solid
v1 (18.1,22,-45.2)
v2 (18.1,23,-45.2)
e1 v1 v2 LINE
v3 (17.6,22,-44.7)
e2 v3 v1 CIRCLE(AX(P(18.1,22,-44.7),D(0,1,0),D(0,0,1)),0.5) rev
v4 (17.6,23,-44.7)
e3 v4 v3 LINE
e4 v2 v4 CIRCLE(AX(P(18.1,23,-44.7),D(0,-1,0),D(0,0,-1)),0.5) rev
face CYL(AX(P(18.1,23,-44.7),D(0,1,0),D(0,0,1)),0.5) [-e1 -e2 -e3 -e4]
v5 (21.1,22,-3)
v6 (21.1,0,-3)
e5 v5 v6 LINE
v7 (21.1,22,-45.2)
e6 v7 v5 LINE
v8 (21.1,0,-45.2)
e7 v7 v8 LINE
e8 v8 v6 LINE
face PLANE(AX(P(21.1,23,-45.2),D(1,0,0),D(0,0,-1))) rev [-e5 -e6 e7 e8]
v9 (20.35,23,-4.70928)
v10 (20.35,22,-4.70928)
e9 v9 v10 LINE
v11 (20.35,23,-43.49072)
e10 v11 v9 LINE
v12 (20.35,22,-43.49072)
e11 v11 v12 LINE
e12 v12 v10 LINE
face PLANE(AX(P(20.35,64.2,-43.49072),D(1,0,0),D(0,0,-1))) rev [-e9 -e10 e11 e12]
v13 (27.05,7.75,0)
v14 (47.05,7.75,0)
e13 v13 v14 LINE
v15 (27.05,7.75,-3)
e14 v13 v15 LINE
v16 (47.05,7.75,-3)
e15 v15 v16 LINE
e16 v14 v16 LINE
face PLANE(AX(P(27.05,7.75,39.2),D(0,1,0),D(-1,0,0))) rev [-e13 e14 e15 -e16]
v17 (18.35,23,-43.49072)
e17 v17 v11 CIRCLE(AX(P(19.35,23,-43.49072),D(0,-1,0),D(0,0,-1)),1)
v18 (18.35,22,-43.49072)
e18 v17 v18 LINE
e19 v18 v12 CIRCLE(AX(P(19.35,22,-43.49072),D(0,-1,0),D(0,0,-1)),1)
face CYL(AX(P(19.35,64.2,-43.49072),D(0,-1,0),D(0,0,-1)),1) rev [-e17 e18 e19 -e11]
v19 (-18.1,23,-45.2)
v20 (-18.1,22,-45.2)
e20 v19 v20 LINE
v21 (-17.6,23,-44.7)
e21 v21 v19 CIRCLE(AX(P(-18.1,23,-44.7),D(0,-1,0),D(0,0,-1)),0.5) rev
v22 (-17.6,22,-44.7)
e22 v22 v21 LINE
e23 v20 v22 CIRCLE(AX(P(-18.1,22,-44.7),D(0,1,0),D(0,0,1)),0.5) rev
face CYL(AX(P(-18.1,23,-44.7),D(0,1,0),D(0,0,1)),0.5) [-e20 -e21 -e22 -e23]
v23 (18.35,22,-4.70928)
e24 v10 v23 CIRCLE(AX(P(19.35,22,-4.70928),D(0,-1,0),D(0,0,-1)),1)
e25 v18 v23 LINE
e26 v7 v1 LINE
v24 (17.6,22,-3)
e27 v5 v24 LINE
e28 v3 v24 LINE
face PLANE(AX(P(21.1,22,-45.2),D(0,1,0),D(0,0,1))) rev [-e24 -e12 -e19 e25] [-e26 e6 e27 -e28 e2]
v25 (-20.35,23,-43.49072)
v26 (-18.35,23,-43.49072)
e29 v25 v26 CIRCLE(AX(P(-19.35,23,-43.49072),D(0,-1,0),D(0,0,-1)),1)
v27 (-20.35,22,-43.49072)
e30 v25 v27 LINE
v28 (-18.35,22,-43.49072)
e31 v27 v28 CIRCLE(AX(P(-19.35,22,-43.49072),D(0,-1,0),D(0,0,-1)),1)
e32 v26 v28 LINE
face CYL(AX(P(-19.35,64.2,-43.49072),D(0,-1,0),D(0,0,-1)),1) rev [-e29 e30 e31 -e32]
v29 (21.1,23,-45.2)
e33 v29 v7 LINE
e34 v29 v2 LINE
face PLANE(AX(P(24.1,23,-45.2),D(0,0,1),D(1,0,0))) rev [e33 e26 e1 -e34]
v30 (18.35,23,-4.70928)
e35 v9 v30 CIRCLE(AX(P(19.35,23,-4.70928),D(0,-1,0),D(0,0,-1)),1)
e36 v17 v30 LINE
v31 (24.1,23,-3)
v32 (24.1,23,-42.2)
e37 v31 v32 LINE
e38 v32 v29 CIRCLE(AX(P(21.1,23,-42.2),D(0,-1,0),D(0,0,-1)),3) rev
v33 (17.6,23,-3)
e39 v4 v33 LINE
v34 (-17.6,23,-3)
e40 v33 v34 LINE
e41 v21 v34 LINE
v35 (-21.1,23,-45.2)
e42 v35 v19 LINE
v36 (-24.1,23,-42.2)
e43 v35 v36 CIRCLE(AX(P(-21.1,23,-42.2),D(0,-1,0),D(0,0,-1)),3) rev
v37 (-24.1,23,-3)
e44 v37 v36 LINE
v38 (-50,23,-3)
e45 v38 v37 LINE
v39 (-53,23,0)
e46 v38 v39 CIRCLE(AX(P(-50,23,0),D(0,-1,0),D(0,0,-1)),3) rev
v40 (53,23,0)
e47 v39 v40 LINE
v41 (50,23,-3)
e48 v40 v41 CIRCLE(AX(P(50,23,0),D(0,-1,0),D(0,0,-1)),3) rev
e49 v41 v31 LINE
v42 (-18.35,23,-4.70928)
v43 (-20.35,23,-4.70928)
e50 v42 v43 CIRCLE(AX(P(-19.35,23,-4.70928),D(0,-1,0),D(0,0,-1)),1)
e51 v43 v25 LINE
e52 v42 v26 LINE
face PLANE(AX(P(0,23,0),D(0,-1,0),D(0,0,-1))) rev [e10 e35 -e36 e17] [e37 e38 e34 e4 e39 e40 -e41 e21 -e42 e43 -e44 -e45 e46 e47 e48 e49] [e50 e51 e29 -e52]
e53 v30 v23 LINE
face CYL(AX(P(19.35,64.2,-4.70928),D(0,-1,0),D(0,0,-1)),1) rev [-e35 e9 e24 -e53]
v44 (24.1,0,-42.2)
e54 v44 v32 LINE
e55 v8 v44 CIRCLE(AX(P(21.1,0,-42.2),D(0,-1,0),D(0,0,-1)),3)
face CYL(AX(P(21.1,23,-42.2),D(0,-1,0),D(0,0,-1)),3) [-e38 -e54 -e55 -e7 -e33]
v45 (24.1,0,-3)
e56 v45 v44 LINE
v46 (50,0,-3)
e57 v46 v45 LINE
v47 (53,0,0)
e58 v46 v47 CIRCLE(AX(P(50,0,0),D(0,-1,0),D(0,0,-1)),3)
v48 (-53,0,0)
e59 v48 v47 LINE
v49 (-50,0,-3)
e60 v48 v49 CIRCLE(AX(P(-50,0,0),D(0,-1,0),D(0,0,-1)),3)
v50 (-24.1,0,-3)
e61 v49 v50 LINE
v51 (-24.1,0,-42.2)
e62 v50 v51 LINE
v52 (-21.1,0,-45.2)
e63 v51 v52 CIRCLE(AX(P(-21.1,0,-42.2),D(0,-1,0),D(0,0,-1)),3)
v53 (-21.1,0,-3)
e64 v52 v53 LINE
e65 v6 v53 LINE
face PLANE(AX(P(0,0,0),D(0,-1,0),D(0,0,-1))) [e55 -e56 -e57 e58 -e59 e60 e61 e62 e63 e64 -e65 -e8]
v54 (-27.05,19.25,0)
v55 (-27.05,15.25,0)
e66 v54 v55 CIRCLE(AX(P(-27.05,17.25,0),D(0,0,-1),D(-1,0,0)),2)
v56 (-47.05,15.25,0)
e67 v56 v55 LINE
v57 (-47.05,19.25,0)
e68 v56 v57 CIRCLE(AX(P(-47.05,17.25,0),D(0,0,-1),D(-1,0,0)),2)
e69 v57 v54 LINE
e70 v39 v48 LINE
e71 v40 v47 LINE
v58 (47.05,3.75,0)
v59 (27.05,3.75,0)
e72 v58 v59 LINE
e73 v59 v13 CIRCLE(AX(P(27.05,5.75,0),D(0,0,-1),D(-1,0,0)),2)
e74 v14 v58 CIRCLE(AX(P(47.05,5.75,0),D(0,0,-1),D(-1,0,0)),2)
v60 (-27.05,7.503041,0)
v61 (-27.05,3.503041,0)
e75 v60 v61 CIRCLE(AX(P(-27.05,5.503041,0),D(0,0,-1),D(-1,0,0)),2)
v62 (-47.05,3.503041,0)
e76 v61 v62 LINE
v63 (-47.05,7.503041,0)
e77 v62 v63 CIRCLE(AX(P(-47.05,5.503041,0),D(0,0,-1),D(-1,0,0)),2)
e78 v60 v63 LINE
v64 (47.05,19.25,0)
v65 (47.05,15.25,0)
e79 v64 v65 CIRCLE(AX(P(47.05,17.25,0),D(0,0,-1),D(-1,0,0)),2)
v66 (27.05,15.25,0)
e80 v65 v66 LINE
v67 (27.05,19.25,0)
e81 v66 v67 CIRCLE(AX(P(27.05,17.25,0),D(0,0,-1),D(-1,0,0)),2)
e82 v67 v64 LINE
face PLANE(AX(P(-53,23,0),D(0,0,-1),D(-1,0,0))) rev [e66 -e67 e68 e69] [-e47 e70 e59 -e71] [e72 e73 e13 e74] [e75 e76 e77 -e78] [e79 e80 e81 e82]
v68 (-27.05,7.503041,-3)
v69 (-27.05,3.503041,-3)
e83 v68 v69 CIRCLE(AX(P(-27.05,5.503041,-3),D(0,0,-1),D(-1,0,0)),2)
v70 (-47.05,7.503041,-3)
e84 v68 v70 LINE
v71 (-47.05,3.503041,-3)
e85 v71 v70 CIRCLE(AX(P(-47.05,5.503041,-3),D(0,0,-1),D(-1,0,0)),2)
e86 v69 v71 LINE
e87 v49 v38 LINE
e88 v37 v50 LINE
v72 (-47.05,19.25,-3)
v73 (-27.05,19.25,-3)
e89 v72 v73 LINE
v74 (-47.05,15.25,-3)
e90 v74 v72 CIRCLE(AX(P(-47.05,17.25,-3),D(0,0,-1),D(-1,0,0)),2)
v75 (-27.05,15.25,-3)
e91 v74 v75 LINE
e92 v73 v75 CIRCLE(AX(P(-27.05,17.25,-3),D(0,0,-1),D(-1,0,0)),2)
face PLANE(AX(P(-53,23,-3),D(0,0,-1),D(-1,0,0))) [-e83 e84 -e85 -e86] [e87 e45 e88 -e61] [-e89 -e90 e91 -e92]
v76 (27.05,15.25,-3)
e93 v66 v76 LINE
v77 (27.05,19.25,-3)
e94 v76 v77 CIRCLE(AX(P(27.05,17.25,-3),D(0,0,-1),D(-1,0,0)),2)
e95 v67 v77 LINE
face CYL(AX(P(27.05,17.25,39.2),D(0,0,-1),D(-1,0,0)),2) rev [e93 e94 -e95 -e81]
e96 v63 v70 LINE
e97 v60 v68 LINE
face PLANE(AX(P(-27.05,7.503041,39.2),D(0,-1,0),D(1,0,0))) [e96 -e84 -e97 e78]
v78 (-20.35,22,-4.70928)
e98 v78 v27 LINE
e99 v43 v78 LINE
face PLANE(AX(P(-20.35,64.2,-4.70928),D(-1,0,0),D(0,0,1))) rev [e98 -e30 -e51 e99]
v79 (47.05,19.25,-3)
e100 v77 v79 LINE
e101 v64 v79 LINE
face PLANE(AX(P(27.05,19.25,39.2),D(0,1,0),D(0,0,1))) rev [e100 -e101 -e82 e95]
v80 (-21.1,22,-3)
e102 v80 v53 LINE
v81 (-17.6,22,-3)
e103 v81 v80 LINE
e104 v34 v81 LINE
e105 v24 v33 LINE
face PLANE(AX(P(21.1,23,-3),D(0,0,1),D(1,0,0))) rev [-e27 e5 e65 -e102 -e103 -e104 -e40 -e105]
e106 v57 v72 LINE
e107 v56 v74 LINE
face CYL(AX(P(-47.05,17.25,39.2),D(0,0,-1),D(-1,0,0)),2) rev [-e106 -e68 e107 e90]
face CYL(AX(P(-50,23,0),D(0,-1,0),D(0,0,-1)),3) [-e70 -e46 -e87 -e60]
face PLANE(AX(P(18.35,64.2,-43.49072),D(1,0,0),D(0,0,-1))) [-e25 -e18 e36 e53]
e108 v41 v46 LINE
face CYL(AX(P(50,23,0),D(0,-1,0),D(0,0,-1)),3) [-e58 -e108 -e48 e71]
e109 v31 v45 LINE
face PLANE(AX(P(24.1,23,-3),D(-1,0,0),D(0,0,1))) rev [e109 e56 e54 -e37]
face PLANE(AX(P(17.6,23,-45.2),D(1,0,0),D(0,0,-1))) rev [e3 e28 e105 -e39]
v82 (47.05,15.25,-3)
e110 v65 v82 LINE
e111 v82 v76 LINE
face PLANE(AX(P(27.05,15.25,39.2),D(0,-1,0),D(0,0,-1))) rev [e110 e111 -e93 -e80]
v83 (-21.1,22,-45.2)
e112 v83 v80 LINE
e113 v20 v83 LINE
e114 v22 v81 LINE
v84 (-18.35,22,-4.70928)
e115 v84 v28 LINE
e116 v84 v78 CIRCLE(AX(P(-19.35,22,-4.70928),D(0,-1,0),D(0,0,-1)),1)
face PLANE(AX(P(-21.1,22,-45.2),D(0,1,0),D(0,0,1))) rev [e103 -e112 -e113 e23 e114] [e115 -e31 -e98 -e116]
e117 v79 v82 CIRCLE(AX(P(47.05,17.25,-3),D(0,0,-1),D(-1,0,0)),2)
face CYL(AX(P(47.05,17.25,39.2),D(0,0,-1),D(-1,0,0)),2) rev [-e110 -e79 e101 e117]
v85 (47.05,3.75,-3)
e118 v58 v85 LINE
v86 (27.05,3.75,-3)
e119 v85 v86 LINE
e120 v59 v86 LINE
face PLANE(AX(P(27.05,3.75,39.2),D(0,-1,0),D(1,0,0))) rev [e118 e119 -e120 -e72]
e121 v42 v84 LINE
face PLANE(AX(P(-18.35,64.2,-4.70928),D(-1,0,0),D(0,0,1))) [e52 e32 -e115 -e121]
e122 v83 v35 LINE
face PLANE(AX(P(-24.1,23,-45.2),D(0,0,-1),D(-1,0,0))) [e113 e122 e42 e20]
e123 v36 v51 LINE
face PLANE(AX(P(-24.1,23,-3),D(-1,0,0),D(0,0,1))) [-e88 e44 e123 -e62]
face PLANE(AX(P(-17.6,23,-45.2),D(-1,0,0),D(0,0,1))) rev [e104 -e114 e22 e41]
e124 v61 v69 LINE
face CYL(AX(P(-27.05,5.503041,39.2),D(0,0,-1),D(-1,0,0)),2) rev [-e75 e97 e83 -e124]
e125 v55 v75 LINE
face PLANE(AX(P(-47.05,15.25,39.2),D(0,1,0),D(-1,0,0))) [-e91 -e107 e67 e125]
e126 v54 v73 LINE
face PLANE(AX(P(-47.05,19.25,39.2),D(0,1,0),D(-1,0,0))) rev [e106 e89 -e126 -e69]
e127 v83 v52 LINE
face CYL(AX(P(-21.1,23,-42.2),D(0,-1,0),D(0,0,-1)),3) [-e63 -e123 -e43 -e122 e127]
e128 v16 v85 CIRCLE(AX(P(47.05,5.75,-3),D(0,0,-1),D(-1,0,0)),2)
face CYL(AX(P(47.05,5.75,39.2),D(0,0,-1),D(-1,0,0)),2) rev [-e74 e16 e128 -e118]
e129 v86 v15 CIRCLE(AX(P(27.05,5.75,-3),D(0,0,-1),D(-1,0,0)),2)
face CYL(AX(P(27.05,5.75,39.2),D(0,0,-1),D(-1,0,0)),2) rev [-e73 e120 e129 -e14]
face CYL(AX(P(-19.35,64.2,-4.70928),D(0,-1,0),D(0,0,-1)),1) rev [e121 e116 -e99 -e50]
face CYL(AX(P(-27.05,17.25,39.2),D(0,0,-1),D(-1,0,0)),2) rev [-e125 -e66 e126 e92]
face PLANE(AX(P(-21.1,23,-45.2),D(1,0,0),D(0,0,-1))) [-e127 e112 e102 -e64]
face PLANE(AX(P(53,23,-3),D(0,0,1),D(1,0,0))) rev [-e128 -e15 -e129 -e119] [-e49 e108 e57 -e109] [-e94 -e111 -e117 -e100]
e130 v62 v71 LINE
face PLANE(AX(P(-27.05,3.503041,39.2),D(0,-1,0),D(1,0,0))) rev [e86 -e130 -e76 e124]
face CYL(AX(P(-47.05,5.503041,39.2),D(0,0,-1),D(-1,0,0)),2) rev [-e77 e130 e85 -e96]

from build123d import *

# Parameters (mm, degrees)
BOSS_EXTRUDE5_DEPTH = 23
SKETCH3_W           = 3.5
SKETCH3_H           = 1
BOSS_EXTRUDE7_DEPTH = 42.2
CUT_EXTRUDE3_DEPTH  = 42.2
CUT_EXTRUDE4_DEPTH  = 42.2
FILLET1_R           = 3
FILLET2_R           = 3
FILLET3_R           = 0.5
FILLET4_R           = 0.5
FILLET5_R           = 3
FILLET6_R           = 3
CUT_EXTRUDE5_DEPTH  = 42.2
CUT_EXTRUDE6_DEPTH  = 42.2
CUT_EXTRUDE7_DEPTH  = 42.2


with BuildPart() as part:
    # Sketch1 → Boss-Extrude5 (new body)
    with BuildSketch(Plane(origin=(0, 0, 0), x_dir=(1, 0, 0), z_dir=(0, 1, 0))):
        Polygon((-53, 0), (53, 0), (53, 3), (24.1, 3), (24.1, 45.2), (21.1, 45.2), (21.1, 3), (-21.1, 3), (-21.1, 45.2), (-24.1, 45.2), (-24.1, 3), (-53, 3), align=None)
    extrude(amount=BOSS_EXTRUDE5_DEPTH)

    # Sketch3 → Boss-Extrude7 (add)
    with BuildSketch(Plane(origin=(0, 0, -3), x_dir=(-1, 0, 0), z_dir=(0, 0, -1))):
        with Locations((-19.35, 22.5)):
            Rectangle(SKETCH3_W, SKETCH3_H)
        with Locations((19.35, 22.5)):
            Rectangle(SKETCH3_W, SKETCH3_H)
    extrude(amount=BOSS_EXTRUDE7_DEPTH)

    # Sketch5 → Cut-Extrude3 (cut)
    with BuildSketch(Plane(origin=(0, 22, 0), x_dir=(-1, 0, 0), z_dir=(0, -1, 0))):
        with BuildLine():
            Line((-18.35, 43.490720045), (-18.35, 4.709279955))
            ThreePointArc((-18.35, 4.709279955), (-19.35, 3.709279955), (-20.35, 4.709279955))
            Line((-20.35, 4.709279955), (-20.35, 43.490720045))
            ThreePointArc((-20.35, 43.490720045), (-19.35, 44.490720045), (-18.35, 43.490720045))
        make_face()
    extrude(amount=-CUT_EXTRUDE3_DEPTH, mode=Mode.SUBTRACT)

    # Sketch5<4> → Cut-Extrude4 (cut)
    with BuildSketch(Plane(origin=(0, 22, 0), x_dir=(-1, 0, 0), z_dir=(0, -1, 0))):
        with BuildLine():
            Line((18.35, 4.709279955), (18.35, 43.490720045))
            ThreePointArc((18.35, 43.490720045), (19.35, 44.490720045), (20.35, 43.490720045))
            Line((20.35, 43.490720045), (20.35, 4.709279955))
            ThreePointArc((20.35, 4.709279955), (19.35, 3.709279955), (18.35, 4.709279955))
        make_face()
    extrude(amount=-CUT_EXTRUDE4_DEPTH, mode=Mode.SUBTRACT)

    # Fillet1
    fillet1_edges = [part.edges().sort_by_distance(p)[0] for p in [
        (-24.1, 11.5, -45.2),
    ]]
    fillet(fillet1_edges, radius=FILLET1_R)

    # Fillet2
    fillet2_edges = [part.edges().sort_by_distance(p)[0] for p in [
        (24.1, 11.5, -45.2),
    ]]
    fillet(fillet2_edges, radius=FILLET2_R)

    # Fillet3
    fillet3_edges = [part.edges().sort_by_distance(p)[0] for p in [
        (-17.6, 22.5, -45.2),
    ]]
    fillet(fillet3_edges, radius=FILLET3_R)

    # Fillet4
    fillet4_edges = [part.edges().sort_by_distance(p)[0] for p in [
        (17.6, 22.5, -45.2),
    ]]
    fillet(fillet4_edges, radius=FILLET4_R)

    # Fillet5
    fillet5_edges = [part.edges().sort_by_distance(p)[0] for p in [
        (53, 11.5, -3),
    ]]
    fillet(fillet5_edges, radius=FILLET5_R - 0.0001)  # a hair under: the kernel refuses the full size

    # Fillet6
    fillet6_edges = [part.edges().sort_by_distance(p)[0] for p in [
        (-53, 11.5, -3),
    ]]
    fillet(fillet6_edges, radius=FILLET6_R - 0.0001)  # a hair under: the kernel refuses the full size

    # Sketch6 → Cut-Extrude5 (cut)
    with BuildSketch(Plane(origin=(0, 0, -3), x_dir=(-1, 0, 0), z_dir=(0, 0, -1))):
        with BuildLine():
            Line((-27.05, 15.25), (-47.05, 15.25))
            ThreePointArc((-47.05, 15.25), (-49.05, 17.25), (-47.05, 19.25))
            Line((-47.05, 19.25), (-27.05, 19.25))
            ThreePointArc((-27.05, 19.25), (-25.05, 17.25), (-27.05, 15.25))
        make_face()
        with BuildLine():
            Line((-27.05, 3.75), (-47.05, 3.75))
            ThreePointArc((-47.05, 3.75), (-49.05, 5.75), (-47.05, 7.75))
            Line((-47.05, 7.75), (-27.05, 7.75))
            ThreePointArc((-27.05, 7.75), (-25.05, 5.75), (-27.05, 3.75))
        make_face()
    extrude(amount=-CUT_EXTRUDE5_DEPTH, mode=Mode.SUBTRACT)

    # Sketch7 → Cut-Extrude6 (cut)
    with BuildSketch(Plane(origin=(0, 0, -3), x_dir=(-1, 0, 0), z_dir=(0, 0, -1))):
        with BuildLine():
            Line((47.05, 15.25), (27.05, 15.25))
            ThreePointArc((27.05, 15.25), (25.05, 17.25), (27.05, 19.25))
            Line((27.05, 19.25), (47.05, 19.25))
            ThreePointArc((47.05, 19.25), (49.05, 17.25), (47.05, 15.25))
        make_face()
    extrude(amount=-CUT_EXTRUDE6_DEPTH, mode=Mode.SUBTRACT)

    # Sketch7<3> → Cut-Extrude7 (cut)
    with BuildSketch(Plane(origin=(0, 0, -3), x_dir=(-1, 0, 0), z_dir=(0, 0, -1))):
        with BuildLine():
            Line((27.05, 7.503040911), (47.05, 7.503040911))
            ThreePointArc((47.05, 7.503040911), (49.05, 5.503040911), (47.05, 3.503040911))
            Line((47.05, 3.503040911), (27.05, 3.503040911))
            ThreePointArc((27.05, 3.503040911), (25.05, 5.503040911), (27.05, 7.503040911))
        make_face()
    extrude(amount=-CUT_EXTRUDE7_DEPTH, mode=Mode.SUBTRACT)


solid = part.part
